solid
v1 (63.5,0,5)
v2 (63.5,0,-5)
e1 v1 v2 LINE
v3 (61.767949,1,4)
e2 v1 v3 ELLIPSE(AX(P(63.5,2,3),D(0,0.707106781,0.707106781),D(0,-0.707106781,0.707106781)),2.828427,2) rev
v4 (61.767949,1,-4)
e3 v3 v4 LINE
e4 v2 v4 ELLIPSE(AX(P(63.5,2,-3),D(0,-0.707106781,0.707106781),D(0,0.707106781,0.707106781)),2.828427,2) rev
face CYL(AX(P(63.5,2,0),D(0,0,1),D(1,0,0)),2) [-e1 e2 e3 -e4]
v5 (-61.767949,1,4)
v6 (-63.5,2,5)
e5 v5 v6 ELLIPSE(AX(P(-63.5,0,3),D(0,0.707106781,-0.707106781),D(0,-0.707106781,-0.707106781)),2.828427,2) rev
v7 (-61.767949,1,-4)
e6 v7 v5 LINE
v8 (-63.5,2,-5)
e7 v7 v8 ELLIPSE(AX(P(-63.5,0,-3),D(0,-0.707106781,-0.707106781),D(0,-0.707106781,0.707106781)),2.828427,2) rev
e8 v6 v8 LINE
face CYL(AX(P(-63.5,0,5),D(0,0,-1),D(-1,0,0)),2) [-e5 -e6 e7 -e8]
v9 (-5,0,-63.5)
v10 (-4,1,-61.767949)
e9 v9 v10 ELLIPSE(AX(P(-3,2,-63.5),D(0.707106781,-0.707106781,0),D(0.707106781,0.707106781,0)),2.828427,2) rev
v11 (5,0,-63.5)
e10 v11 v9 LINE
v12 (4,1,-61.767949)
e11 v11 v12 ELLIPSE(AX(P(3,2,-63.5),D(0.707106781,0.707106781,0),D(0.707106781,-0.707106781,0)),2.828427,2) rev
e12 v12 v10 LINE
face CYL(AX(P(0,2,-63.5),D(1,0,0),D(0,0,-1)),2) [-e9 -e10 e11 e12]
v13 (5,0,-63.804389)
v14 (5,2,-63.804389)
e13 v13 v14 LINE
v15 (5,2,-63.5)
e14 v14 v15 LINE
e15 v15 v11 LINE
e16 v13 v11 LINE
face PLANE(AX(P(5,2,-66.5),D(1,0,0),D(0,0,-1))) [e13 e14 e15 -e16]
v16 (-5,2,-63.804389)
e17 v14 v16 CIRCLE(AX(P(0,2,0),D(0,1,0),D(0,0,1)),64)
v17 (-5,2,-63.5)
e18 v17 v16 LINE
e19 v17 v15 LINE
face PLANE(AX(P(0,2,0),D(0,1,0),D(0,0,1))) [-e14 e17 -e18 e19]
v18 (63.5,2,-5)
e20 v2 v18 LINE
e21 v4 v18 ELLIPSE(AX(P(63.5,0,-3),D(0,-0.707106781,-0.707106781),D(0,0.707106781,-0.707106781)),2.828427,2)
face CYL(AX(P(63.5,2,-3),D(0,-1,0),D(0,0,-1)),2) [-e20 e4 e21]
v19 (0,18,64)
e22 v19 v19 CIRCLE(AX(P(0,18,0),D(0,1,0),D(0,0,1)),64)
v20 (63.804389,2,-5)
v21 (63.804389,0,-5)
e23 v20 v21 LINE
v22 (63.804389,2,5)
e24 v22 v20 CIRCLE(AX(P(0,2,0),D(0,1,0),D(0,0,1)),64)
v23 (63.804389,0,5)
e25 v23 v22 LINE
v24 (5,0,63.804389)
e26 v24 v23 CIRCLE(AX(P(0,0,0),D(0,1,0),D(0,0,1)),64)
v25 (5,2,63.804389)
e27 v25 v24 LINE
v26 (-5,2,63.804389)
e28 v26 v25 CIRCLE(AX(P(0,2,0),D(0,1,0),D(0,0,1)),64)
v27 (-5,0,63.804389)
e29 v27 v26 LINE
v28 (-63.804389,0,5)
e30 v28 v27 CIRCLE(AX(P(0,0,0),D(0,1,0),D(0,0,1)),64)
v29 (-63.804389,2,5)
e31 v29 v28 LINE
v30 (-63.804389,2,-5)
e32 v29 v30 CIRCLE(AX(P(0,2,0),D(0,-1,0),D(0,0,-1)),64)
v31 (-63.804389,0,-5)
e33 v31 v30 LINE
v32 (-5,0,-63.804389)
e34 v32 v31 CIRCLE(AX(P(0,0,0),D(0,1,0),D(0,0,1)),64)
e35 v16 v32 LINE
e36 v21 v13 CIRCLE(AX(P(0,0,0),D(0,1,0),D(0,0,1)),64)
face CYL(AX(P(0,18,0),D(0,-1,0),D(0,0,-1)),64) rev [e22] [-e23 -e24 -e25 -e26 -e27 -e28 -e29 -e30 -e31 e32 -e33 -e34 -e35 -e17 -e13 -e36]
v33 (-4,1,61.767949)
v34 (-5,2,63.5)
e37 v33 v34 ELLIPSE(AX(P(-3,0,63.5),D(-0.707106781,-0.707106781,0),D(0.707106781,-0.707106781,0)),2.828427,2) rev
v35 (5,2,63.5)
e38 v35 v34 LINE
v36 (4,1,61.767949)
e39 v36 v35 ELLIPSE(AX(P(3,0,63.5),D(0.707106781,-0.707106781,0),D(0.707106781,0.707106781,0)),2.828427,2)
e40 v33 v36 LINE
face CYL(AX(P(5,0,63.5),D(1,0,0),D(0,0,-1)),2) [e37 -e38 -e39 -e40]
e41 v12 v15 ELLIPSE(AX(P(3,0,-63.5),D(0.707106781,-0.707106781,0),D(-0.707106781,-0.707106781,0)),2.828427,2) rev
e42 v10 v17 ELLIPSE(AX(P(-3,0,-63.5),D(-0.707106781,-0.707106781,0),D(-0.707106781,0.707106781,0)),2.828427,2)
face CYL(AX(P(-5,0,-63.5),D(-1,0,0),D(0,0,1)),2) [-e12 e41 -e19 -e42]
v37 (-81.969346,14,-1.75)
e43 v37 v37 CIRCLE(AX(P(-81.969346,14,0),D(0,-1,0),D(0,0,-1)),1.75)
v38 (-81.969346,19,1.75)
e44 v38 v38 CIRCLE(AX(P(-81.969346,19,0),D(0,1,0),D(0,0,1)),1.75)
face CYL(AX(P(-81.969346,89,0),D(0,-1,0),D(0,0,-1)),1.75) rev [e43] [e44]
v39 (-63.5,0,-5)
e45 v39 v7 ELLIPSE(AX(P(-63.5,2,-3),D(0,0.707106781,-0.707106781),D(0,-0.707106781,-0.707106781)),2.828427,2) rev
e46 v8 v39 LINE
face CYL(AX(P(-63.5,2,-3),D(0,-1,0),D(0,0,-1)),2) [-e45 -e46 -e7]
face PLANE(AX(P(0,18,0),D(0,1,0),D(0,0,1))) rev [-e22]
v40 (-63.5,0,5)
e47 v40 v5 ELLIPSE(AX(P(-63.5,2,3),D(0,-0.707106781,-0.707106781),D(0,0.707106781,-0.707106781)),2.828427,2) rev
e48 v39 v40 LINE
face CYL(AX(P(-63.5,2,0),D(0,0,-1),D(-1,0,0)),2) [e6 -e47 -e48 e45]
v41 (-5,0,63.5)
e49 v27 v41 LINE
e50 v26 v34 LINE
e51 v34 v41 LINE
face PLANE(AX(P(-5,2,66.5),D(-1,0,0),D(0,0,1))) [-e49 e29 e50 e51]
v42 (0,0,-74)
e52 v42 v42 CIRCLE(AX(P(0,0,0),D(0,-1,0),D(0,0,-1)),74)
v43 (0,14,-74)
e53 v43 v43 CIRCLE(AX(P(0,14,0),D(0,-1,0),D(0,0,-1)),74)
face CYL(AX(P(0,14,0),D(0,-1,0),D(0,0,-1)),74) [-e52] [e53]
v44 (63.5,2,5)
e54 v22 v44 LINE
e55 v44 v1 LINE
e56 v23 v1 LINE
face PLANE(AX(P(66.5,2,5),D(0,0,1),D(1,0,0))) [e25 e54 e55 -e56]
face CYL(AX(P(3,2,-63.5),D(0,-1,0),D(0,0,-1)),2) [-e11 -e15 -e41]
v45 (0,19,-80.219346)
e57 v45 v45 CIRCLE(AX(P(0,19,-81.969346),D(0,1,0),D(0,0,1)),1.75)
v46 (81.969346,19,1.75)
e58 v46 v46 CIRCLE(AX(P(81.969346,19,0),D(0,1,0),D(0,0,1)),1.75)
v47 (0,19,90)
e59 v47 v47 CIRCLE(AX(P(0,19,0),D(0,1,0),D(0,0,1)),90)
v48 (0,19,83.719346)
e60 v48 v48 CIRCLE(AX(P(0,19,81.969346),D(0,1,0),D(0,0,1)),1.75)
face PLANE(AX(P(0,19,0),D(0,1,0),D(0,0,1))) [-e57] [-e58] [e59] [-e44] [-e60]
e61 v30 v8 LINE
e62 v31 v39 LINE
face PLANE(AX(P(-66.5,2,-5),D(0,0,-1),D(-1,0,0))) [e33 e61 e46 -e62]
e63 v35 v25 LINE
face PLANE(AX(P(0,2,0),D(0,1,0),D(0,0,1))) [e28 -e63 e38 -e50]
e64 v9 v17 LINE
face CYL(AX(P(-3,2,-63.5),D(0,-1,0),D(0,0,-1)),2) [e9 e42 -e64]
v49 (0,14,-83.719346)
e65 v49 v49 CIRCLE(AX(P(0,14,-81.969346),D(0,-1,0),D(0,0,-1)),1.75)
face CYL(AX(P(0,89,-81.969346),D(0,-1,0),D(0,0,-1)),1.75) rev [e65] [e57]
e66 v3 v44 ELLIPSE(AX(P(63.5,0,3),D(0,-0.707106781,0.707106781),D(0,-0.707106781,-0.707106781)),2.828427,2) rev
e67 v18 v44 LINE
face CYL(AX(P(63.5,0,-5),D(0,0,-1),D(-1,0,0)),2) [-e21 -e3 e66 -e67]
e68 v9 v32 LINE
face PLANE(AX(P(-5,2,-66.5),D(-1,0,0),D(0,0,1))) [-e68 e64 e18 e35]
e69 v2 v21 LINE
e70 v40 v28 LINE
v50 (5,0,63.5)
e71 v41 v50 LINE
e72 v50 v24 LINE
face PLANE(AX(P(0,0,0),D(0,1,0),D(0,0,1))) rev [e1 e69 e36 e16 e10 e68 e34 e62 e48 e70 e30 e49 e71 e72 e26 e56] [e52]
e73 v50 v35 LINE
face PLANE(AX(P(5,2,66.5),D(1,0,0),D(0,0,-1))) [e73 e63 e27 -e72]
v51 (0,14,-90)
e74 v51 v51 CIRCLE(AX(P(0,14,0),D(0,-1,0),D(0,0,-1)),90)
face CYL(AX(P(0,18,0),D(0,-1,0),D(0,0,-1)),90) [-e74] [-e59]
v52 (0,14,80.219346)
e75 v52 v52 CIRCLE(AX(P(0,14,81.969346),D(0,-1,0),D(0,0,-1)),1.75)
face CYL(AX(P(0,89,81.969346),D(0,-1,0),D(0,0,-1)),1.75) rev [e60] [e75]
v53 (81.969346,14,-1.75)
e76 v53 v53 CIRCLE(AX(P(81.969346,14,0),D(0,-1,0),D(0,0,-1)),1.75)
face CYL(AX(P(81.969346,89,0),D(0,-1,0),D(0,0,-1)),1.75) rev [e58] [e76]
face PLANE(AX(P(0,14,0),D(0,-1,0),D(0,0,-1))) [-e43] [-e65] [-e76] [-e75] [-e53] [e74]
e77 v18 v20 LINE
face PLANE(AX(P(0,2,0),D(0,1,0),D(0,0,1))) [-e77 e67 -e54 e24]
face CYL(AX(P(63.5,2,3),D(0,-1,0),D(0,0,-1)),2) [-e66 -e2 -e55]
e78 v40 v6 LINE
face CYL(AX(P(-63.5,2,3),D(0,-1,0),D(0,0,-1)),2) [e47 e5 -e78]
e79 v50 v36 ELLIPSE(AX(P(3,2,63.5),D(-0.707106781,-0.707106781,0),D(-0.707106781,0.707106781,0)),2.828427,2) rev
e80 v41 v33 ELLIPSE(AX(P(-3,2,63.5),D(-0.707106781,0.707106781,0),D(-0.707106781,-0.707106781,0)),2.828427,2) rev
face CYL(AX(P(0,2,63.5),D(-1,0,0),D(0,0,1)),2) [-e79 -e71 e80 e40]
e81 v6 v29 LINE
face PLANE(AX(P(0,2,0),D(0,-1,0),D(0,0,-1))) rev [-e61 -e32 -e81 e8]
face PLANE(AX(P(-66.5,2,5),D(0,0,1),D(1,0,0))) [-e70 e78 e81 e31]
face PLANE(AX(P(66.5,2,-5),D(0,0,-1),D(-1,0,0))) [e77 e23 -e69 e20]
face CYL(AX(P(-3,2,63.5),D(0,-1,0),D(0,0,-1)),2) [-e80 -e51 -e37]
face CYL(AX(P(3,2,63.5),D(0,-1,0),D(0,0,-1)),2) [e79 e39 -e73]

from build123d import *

# Parameters (mm, degrees)
SKETCH1_R           = 90
SKETCH1_R_2         = 64
BOSS_EXTRUDE1_DEPTH = 18
SKETCH2_R           = 90
BOSS_EXTRUDE2_DEPTH = 1
SKETCH3_R           = 90
SKETCH3_R_2         = 74
CUT_EXTRUDE1_DEPTH  = 14
SKETCH4_W           = 10
SKETCH4_H           = 5
SKETCH4_W_2         = 5
SKETCH4_H_2         = 10
BOSS_EXTRUDE3_DEPTH = 2
FILLET1_R           = 2
SKETCH5_R           = 1.75
CUT_EXTRUDE2_DEPTH  = 75


with BuildPart() as part:
    # Sketch1 → Boss-Extrude1 (new body)
    with BuildSketch(Plane(origin=(0, 0, 0), x_dir=(1, 0, 0), z_dir=(0, 1, 0))):
        with Locations(Location((0, 0, 0), (0, 0, 270))):
            Circle(SKETCH1_R)
        with Locations(Location((0, 0, 0), (0, 0, 270))):
            Circle(SKETCH1_R_2, mode=Mode.SUBTRACT)
    extrude(amount=BOSS_EXTRUDE1_DEPTH)

    # Sketch2 → Boss-Extrude2 (add)
    with BuildSketch(Plane(origin=(0, 18, 0), x_dir=(1, 0, 0), z_dir=(0, 1, 0))):
        with Locations(Location((0, 0, 0), (0, 0, 270))):
            Circle(SKETCH2_R)
    extrude(amount=BOSS_EXTRUDE2_DEPTH)

    # Sketch3 → Cut-Extrude1 (cut)
    with BuildSketch(Plane.XZ):
        with Locations(Location((0, 0, 0), (0, 0, 270))):
            Circle(SKETCH3_R)
        with Locations(Location((0, 0, 0), (0, 0, 270))):
            Circle(SKETCH3_R_2, mode=Mode.SUBTRACT)
    extrude(amount=-CUT_EXTRUDE1_DEPTH, mode=Mode.SUBTRACT)

    # Sketch4 → Boss-Extrude3 (add)
    with BuildSketch(Plane.XZ):
        with Locations((0, 64)):
            Rectangle(SKETCH4_W, SKETCH4_H)
        with Locations((-64, 0)):
            Rectangle(SKETCH4_W_2, SKETCH4_H_2)
        with Locations((64, 0)):
            Rectangle(SKETCH4_W_2, SKETCH4_H_2)
        with Locations((0, -64)):
            Rectangle(SKETCH4_W, SKETCH4_H)
    extrude(amount=-BOSS_EXTRUDE3_DEPTH)

    # Fillet1
    # the kernel refuses this fillet: 2 mm, written as the material it takes off along each edge
    with BuildSketch(Plane(origin=(-61.5, 0, 5), x_dir=(-1, 0, 0), z_dir=(0, 0, -1)), Plane(origin=(-5, 2, 61.5), x_dir=(0, 0, 1), z_dir=(1, 0, 0)), Plane(origin=(61.5, 2, 5), x_dir=(1, 0, 0), z_dir=(0, 0, -1)), Plane(origin=(5, 2, -61.5), x_dir=(0, 0, -1), z_dir=(-1, 0, 0))) as fillet1_piece_1:
        with BuildLine():
            CenterArc((FILLET1_R, FILLET1_R), FILLET1_R, 180, 90)
            Line((0, FILLET1_R), (0, 0))
            Line((0, 0), (FILLET1_R, 0))
        make_face()
    extrude(amount=10, mode=Mode.SUBTRACT)
    with BuildSketch(Plane(origin=(-61.5, 2, 5), x_dir=(-1, 0, 0), z_dir=(0, 0, -1)), Plane(origin=(-5, 0, 61.5), x_dir=(0, 0, 1), z_dir=(1, 0, 0)), Plane(origin=(61.5, 0, 5), x_dir=(1, 0, 0), z_dir=(0, 0, -1)), Plane(origin=(5, 0, -61.5), x_dir=(0, 0, -1), z_dir=(-1, 0, 0))) as fillet1_piece_2:
        with BuildLine():
            CenterArc((FILLET1_R, -FILLET1_R), FILLET1_R, 90, 90)
            Line((0, -FILLET1_R), (0, 0))
            Line((0, 0), (FILLET1_R, 0))
        make_face()
    extrude(amount=10, mode=Mode.SUBTRACT)
    with BuildSketch(Plane(origin=(-61.5, -5, 5), x_dir=(-1, 0, 0), z_dir=(0, 1, 0)), Plane(origin=(5, -5, 61.5), x_dir=(0, 0, 1), z_dir=(0, 1, 0)), Plane(origin=(61.5, -5, -5), x_dir=(1, 0, 0), z_dir=(0, 1, 0)), Plane(origin=(-5, -5, -61.5), x_dir=(0, 0, -1), z_dir=(0, 1, 0))) as fillet1_piece_3:
        with BuildLine():
            CenterArc((FILLET1_R, -FILLET1_R), FILLET1_R, 90, 90)
            Line((0, -FILLET1_R), (0, 0))
            Line((0, 0), (FILLET1_R, 0))
        make_face()
    extrude(amount=12, mode=Mode.SUBTRACT)
    with BuildSketch(Plane(origin=(-61.5, -5, -5), x_dir=(-1, 0, 0), z_dir=(0, 1, 0)), Plane(origin=(-5, -5, 61.5), x_dir=(0, 0, 1), z_dir=(0, 1, 0)), Plane(origin=(61.5, -5, 5), x_dir=(1, 0, 0), z_dir=(0, 1, 0)), Plane(origin=(5, -5, -61.5), x_dir=(0, 0, -1), z_dir=(0, 1, 0))) as fillet1_piece_4:
        with BuildLine():
            CenterArc((FILLET1_R, FILLET1_R), FILLET1_R, 180, 90)
            Line((0, FILLET1_R), (0, 0))
            Line((0, 0), (FILLET1_R, 0))
        make_face()
    extrude(amount=12, mode=Mode.SUBTRACT)

    # Sketch5 → Cut-Extrude2 (cut)
    with BuildSketch(Plane.XZ.offset(-14)):
        with Locations(Location((0, 81.969345849, 0), (0, 0, 270))):
            Circle(SKETCH5_R)
        with Locations(Location((81.969345849, 0, 0), (0, 0, 270))):
            Circle(SKETCH5_R)
        with Locations(Location((0, -81.969345849, 0), (0, 0, 270))):
            Circle(SKETCH5_R)
        with Locations(Location((-81.969345849, 0, 0), (0, 0, 270))):
            Circle(SKETCH5_R)
    extrude(amount=-CUT_EXTRUDE2_DEPTH, mode=Mode.SUBTRACT)


solid = part.part
